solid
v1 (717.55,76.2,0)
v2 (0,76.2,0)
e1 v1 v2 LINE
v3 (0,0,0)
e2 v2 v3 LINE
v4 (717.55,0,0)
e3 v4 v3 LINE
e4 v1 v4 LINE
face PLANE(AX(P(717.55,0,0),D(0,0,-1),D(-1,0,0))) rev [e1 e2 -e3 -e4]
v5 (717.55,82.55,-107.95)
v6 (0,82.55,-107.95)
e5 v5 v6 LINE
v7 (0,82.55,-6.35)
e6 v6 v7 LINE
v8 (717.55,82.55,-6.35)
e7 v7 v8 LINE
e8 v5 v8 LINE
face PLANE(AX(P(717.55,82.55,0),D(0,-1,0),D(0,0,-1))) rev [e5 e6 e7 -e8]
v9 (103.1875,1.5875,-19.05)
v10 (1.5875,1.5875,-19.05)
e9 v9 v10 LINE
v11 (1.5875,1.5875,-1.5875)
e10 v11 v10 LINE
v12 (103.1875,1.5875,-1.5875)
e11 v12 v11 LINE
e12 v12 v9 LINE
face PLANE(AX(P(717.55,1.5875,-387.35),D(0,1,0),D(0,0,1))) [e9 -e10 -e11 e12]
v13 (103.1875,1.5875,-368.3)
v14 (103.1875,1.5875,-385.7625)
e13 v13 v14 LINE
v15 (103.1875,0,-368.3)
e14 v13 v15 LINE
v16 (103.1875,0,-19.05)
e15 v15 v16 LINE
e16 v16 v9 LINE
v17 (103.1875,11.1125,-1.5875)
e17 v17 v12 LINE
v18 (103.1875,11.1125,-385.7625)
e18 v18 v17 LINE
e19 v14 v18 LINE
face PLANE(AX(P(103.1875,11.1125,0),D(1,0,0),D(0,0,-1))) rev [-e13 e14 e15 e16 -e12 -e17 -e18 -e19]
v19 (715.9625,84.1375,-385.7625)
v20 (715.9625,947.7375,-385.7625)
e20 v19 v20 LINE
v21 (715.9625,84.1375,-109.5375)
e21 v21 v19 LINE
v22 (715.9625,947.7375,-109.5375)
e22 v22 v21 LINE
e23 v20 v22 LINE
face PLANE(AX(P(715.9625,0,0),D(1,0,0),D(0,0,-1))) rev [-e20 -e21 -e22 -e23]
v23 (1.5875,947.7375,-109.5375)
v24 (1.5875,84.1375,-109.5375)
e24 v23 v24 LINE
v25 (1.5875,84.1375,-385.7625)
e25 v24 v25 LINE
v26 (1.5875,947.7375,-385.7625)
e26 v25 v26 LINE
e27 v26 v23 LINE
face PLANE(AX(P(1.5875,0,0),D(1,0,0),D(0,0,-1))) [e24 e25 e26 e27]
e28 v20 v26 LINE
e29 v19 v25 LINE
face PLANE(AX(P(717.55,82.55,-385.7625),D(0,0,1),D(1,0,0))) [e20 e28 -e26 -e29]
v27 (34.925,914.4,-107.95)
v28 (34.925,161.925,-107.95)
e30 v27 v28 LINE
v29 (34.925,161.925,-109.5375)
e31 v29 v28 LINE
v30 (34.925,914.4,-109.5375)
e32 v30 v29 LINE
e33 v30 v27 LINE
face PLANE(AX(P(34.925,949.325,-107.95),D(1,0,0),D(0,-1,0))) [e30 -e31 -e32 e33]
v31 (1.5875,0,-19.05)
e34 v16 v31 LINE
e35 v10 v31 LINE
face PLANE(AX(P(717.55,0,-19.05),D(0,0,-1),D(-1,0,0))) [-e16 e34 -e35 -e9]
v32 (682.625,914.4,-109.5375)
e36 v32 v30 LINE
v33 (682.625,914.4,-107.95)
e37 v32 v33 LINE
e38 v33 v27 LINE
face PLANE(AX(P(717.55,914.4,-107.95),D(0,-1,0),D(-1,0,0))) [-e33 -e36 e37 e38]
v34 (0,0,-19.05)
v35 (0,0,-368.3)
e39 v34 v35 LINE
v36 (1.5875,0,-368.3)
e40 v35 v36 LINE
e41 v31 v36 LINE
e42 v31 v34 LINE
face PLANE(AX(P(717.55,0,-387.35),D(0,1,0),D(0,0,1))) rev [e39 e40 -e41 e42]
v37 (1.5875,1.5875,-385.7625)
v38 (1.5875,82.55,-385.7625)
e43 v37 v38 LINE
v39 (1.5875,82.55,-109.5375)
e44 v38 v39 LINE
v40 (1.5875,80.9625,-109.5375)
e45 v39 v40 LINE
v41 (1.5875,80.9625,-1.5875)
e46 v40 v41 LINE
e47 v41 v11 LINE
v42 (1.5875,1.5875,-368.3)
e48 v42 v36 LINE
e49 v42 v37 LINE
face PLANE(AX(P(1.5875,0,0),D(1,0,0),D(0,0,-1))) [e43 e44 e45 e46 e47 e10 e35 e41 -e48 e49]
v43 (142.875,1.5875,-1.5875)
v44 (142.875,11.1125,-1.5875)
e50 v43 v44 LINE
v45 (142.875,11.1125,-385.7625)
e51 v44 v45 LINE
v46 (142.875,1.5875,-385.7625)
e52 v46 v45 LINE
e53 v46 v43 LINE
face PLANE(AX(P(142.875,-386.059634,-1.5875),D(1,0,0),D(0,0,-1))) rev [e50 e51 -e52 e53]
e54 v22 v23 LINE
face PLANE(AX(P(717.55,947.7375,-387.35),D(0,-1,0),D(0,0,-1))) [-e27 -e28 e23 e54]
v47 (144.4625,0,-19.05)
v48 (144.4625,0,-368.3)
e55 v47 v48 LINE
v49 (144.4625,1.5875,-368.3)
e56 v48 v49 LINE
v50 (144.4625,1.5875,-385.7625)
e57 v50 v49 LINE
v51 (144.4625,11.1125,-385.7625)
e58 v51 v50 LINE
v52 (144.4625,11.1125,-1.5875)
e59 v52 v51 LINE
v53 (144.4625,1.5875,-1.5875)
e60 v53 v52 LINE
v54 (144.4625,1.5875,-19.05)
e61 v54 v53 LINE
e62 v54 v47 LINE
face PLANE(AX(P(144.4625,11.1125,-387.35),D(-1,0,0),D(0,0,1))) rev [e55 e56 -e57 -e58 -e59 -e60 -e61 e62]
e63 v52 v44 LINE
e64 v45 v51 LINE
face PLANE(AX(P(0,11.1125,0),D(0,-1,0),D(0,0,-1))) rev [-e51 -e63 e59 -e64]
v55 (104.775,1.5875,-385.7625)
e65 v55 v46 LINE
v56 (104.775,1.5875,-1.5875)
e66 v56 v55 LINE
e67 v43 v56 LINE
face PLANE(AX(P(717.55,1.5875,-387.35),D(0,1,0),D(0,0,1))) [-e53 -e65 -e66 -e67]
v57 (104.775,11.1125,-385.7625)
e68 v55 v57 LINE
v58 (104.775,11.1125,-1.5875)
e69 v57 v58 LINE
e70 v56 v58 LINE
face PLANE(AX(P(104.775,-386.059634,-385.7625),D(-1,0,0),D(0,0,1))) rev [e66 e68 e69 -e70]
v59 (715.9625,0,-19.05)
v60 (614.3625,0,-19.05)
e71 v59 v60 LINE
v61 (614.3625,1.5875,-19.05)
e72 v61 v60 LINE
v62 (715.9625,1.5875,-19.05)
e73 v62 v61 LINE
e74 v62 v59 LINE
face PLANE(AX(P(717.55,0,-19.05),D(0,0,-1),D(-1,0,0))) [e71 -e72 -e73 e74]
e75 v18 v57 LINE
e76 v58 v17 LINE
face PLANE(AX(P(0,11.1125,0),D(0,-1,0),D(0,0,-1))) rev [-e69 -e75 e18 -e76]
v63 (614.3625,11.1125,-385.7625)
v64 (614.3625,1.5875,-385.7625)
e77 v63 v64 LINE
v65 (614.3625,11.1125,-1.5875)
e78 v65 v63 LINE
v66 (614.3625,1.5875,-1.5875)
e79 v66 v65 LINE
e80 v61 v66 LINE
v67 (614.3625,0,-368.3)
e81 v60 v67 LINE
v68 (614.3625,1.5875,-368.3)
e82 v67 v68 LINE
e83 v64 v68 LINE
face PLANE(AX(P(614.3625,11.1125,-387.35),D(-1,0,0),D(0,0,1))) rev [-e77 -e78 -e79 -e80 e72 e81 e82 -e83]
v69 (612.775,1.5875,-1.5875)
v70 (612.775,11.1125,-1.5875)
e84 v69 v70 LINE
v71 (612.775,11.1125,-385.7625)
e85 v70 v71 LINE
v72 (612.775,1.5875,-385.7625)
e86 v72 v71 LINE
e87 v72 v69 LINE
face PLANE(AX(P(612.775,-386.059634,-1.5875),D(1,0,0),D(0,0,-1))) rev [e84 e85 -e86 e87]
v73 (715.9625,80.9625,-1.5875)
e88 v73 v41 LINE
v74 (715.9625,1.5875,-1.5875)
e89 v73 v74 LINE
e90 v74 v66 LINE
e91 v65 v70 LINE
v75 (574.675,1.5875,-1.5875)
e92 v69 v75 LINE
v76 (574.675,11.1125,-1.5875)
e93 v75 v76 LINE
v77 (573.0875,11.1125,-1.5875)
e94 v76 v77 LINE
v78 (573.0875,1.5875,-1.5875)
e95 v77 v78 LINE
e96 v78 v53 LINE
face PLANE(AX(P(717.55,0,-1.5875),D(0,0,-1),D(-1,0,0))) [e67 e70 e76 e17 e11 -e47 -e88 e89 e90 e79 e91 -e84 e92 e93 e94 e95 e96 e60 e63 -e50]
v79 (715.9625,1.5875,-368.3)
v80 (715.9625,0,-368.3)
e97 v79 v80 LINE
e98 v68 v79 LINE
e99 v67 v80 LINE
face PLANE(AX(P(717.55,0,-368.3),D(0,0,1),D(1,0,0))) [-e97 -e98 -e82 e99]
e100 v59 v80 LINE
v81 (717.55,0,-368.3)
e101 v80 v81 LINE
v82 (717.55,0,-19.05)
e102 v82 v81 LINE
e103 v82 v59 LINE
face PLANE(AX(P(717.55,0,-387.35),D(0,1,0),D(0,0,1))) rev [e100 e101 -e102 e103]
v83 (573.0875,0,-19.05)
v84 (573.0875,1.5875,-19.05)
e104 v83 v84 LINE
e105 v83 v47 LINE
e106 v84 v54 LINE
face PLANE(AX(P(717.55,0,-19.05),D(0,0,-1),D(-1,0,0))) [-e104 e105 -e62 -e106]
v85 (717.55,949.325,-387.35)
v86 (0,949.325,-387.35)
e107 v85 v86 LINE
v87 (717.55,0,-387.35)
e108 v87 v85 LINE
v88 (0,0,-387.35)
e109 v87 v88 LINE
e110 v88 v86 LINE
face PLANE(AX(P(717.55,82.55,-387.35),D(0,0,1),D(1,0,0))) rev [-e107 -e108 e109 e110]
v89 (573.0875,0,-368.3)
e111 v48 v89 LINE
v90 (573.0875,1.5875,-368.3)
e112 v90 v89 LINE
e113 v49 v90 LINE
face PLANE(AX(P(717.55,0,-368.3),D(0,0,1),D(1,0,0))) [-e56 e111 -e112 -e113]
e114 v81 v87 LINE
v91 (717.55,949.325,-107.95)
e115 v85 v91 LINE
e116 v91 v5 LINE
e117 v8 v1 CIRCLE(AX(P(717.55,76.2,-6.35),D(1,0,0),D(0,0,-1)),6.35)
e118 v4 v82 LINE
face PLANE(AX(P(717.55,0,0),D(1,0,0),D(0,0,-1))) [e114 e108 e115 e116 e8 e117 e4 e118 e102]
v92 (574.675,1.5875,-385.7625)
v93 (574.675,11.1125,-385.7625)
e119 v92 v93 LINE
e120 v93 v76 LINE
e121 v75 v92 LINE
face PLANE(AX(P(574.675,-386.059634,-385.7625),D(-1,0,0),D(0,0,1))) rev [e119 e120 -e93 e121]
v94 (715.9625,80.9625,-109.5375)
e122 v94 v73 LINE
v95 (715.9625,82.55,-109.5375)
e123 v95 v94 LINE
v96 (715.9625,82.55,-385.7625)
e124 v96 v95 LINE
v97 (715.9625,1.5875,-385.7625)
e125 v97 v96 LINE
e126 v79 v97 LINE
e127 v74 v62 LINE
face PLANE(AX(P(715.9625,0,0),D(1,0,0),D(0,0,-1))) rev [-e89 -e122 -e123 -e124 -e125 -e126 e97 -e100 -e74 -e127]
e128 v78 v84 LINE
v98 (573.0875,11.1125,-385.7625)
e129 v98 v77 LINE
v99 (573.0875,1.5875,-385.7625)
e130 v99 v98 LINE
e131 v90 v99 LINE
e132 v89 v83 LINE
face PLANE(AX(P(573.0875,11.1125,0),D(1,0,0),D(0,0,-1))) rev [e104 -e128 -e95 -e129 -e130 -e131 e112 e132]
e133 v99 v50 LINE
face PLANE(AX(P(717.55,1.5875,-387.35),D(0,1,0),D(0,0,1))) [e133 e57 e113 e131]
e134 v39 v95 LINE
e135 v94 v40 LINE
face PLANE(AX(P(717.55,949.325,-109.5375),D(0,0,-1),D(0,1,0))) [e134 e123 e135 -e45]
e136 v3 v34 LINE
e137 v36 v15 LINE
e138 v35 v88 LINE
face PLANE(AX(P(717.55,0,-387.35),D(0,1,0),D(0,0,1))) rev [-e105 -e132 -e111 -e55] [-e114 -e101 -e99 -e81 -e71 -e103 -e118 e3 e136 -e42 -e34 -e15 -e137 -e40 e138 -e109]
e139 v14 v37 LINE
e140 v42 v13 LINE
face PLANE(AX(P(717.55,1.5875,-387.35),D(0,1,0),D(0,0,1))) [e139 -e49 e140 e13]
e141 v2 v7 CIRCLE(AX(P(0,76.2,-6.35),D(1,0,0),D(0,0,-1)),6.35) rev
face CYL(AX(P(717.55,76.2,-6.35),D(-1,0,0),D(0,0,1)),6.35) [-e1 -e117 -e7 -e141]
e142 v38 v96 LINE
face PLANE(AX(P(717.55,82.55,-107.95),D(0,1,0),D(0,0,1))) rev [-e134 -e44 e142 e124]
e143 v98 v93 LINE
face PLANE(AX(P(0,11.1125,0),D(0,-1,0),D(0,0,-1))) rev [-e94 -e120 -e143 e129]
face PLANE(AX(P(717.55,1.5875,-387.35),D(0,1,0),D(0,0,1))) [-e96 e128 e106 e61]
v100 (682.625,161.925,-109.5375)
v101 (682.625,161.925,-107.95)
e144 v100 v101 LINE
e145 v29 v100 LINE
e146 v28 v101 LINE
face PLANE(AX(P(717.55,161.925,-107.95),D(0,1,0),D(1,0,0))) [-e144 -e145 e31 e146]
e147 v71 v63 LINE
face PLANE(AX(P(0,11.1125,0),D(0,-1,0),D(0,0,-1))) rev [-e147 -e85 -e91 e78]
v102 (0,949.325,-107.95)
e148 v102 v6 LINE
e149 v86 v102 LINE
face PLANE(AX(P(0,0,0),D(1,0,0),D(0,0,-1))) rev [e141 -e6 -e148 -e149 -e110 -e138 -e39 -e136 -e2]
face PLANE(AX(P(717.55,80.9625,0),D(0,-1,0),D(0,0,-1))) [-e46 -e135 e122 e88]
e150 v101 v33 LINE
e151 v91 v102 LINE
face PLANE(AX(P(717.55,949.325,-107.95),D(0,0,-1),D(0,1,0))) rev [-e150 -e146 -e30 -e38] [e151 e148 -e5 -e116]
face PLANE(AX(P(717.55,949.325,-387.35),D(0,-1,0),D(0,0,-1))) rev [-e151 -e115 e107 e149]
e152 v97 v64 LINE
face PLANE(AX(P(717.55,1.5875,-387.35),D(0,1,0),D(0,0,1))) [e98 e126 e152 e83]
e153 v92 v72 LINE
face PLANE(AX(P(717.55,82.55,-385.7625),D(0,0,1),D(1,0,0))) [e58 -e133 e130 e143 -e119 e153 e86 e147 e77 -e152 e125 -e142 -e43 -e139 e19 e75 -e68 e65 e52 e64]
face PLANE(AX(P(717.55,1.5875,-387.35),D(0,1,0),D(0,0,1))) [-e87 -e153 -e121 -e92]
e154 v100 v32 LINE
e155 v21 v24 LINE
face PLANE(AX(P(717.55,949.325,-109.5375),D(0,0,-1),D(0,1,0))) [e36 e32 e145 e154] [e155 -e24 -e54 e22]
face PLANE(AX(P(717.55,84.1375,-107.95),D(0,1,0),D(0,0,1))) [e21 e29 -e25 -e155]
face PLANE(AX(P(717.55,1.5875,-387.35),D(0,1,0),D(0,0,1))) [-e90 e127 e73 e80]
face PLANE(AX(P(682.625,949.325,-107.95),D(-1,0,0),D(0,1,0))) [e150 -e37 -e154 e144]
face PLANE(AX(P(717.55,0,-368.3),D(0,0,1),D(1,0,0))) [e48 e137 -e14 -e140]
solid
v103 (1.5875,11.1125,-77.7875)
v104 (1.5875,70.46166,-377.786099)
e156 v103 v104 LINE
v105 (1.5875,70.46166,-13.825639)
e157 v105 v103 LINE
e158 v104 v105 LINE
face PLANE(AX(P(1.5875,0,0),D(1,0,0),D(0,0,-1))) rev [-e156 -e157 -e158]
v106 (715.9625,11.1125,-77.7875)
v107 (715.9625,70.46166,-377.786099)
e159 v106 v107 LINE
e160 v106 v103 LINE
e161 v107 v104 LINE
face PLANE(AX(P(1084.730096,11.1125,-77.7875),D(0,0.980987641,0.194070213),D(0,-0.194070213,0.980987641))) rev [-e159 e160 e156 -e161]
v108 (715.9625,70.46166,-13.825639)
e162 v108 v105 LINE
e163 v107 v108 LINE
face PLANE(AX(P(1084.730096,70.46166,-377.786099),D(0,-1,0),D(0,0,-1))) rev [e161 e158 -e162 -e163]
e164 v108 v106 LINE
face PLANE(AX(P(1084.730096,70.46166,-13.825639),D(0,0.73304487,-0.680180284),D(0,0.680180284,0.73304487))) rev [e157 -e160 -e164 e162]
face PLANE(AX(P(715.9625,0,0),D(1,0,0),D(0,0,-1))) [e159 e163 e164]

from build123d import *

# Parameters (mm, degrees)
SKETCH1_W           = 279.4
SKETCH1_H           = 866.775
BOSS_EXTRUDE1_DEPTH = 717.55
SHELL2_START        = 1.5875
SHELL2_OUTLINE_W    = 863.6
SHELL2_OUTLINE_H    = 276.225
SHELL2_DEPTH        = 714.375
SHELL2_START_2      = 34.925
SHELL2_2_OUTLINE_W  = 752.475
SHELL2_2_OUTLINE_H  = 1.5875
SHELL2_2_DEPTH      = 647.7
BOSS_EXTRUDE2_DEPTH = 717.55
SHELL3_START        = -385.7625
SHELL3_OUTLINE_W    = 714.375
SHELL3_OUTLINE_H    = 79.375
SHELL3_DEPTH        = 384.175
SHELL3_START_2      = -368.3
SHELL3_2_OUTLINE_W  = 714.375
SHELL3_2_OUTLINE_H  = 1.5875
SHELL3_2_DEPTH      = 258.7625
SHELL3_START_3      = -109.5375
SHELL3_3_OUTLINE_W  = 714.375
SHELL3_3_OUTLINE_H  = 1.5875
SHELL3_3_DEPTH      = 90.4875
SHELL3_4_OUTLINE_W  = 714.375
SHELL3_4_OUTLINE_H  = 1.5875
SHELL3_4_DEPTH      = 17.4625
FILLET1_R           = 6.35
SKETCH6_W           = 41.275
SKETCH6_H           = 387.35
BOSS_EXTRUDE3_DEPTH = 11.1125
SKETCH8_W           = 38.1
SKETCH8_H           = 384.175
CUT_EXTRUDE1_DEPTH  = 9.525
BOSS_EXTRUDE6_REACH = 1252.544


# Read off the part's stored shape, not the designer's step: Shell2, Shell3
with BuildPart() as part:
    # Sketch1 → Boss-Extrude1 (new body)
    with BuildSketch(Plane(origin=(0, 0, 0), x_dir=(0, 0, -1), z_dir=(1, 0, 0))):
        with Locations((247.65, 515.9375)):
            Rectangle(SKETCH1_W, SKETCH1_H)
    extrude(amount=BOSS_EXTRUDE1_DEPTH)

    # Shell2 outline → Shell2 (cut)
    with BuildSketch(Plane.YZ.offset(SHELL2_START)):
        with Locations((515.9375, -247.65)):
            Rectangle(SHELL2_OUTLINE_W, SHELL2_OUTLINE_H)
    extrude(amount=SHELL2_DEPTH, mode=Mode.SUBTRACT)

    # Shell2 2 outline → Shell2 2 (cut)
    with BuildSketch(Plane.YZ.offset(SHELL2_START_2)):
        with Locations((538.1625, -108.74375)):
            Rectangle(SHELL2_2_OUTLINE_W, SHELL2_2_OUTLINE_H)
    extrude(amount=SHELL2_2_DEPTH, mode=Mode.SUBTRACT)

    # Sketch4 → Boss-Extrude2 (add)
    with BuildSketch(Plane(origin=(0, 0, 0), x_dir=(0, 0, -1), z_dir=(1, 0, 0))):
        Polygon((0, 0), (0, 82.55), (107.95, 82.55), (387.35, 82.55), (387.35, 0), align=None)
    extrude(amount=BOSS_EXTRUDE2_DEPTH)

    # Shell3 outline → Shell3 (cut)
    with BuildSketch(Plane.XY.offset(SHELL3_START)):
        with Locations((358.775, 41.275)):
            Rectangle(SHELL3_OUTLINE_W, SHELL3_OUTLINE_H)
    extrude(amount=SHELL3_DEPTH, mode=Mode.SUBTRACT)

    # Shell3 2 outline → Shell3 2 (cut)
    with BuildSketch(Plane.XY.offset(SHELL3_START_2)):
        with Locations((358.775, 0.79375)):
            Rectangle(SHELL3_2_OUTLINE_W, SHELL3_2_OUTLINE_H)
        with Locations((358.775, 81.75625)):
            Rectangle(SHELL3_2_OUTLINE_W, SHELL3_2_OUTLINE_H)
    extrude(amount=SHELL3_2_DEPTH, mode=Mode.SUBTRACT)

    # Shell3 3 outline → Shell3 3 (cut)
    with BuildSketch(Plane.XY.offset(SHELL3_START_3)):
        with Locations((358.775, 0.79375)):
            Rectangle(SHELL3_3_OUTLINE_W, SHELL3_3_OUTLINE_H)
    extrude(amount=SHELL3_3_DEPTH, mode=Mode.SUBTRACT)

    # Shell3 4 outline → Shell3 4 (cut)
    with BuildSketch(Plane.XY.offset(SHELL3_START)):
        with Locations((358.775, 81.75625)):
            Rectangle(SHELL3_4_OUTLINE_W, SHELL3_4_OUTLINE_H)
    extrude(amount=SHELL3_4_DEPTH, mode=Mode.SUBTRACT)

    # Fillet1
    fillet1_edges = [part.edges().sort_by_distance(p)[0] for p in [
        (358.775, 82.55, 0),
    ]]
    fillet(fillet1_edges, radius=FILLET1_R)

    # Sketch6 → Boss-Extrude3 (add)
    with BuildSketch(Plane(origin=(0, 0, 0), x_dir=(1, 0, 0), z_dir=(0, 1, 0))):
        with Locations((123.825, 193.675)):
            Rectangle(SKETCH6_W, SKETCH6_H)
        with Locations((593.725, 193.675)):
            Rectangle(SKETCH6_W, SKETCH6_H)
    extrude(amount=BOSS_EXTRUDE3_DEPTH)

    # Sketch8 → Cut-Extrude1 (cut)
    with BuildSketch(Plane(origin=(0, 11.1125, 0), x_dir=(1, 0, 0), z_dir=(0, 1, 0))):
        with Locations((123.825, 193.675)):
            Rectangle(SKETCH8_W, SKETCH8_H)
        with Locations((593.725, 193.675)):
            Rectangle(SKETCH8_W, SKETCH8_H)
    extrude(amount=-CUT_EXTRUDE1_DEPTH, mode=Mode.SUBTRACT)


with BuildPart() as body_2:

    # Sketch9 → Boss-Extrude6 (new, up to next)
    with BuildSketch(Plane(origin=(1.5875, 0, 0), x_dir=(0, 0, -1), z_dir=(1, 0, 0)), mode=Mode.PRIVATE) as boss_extrude6_sk1:
        Polygon((13.825638806, 70.461659548), (77.7875, 11.1125), (377.786099377, 70.461659548), align=None)
    boss_extrude6_tool1 = extrude(boss_extrude6_sk1.sketch, amount=BOSS_EXTRUDE6_REACH, mode=Mode.PRIVATE) - part.part
    add(boss_extrude6_tool1.solids().sort_by_distance((1.5875, 50.678606, -156.466413))[0])


solid = Compound([part.part, body_2.part])
